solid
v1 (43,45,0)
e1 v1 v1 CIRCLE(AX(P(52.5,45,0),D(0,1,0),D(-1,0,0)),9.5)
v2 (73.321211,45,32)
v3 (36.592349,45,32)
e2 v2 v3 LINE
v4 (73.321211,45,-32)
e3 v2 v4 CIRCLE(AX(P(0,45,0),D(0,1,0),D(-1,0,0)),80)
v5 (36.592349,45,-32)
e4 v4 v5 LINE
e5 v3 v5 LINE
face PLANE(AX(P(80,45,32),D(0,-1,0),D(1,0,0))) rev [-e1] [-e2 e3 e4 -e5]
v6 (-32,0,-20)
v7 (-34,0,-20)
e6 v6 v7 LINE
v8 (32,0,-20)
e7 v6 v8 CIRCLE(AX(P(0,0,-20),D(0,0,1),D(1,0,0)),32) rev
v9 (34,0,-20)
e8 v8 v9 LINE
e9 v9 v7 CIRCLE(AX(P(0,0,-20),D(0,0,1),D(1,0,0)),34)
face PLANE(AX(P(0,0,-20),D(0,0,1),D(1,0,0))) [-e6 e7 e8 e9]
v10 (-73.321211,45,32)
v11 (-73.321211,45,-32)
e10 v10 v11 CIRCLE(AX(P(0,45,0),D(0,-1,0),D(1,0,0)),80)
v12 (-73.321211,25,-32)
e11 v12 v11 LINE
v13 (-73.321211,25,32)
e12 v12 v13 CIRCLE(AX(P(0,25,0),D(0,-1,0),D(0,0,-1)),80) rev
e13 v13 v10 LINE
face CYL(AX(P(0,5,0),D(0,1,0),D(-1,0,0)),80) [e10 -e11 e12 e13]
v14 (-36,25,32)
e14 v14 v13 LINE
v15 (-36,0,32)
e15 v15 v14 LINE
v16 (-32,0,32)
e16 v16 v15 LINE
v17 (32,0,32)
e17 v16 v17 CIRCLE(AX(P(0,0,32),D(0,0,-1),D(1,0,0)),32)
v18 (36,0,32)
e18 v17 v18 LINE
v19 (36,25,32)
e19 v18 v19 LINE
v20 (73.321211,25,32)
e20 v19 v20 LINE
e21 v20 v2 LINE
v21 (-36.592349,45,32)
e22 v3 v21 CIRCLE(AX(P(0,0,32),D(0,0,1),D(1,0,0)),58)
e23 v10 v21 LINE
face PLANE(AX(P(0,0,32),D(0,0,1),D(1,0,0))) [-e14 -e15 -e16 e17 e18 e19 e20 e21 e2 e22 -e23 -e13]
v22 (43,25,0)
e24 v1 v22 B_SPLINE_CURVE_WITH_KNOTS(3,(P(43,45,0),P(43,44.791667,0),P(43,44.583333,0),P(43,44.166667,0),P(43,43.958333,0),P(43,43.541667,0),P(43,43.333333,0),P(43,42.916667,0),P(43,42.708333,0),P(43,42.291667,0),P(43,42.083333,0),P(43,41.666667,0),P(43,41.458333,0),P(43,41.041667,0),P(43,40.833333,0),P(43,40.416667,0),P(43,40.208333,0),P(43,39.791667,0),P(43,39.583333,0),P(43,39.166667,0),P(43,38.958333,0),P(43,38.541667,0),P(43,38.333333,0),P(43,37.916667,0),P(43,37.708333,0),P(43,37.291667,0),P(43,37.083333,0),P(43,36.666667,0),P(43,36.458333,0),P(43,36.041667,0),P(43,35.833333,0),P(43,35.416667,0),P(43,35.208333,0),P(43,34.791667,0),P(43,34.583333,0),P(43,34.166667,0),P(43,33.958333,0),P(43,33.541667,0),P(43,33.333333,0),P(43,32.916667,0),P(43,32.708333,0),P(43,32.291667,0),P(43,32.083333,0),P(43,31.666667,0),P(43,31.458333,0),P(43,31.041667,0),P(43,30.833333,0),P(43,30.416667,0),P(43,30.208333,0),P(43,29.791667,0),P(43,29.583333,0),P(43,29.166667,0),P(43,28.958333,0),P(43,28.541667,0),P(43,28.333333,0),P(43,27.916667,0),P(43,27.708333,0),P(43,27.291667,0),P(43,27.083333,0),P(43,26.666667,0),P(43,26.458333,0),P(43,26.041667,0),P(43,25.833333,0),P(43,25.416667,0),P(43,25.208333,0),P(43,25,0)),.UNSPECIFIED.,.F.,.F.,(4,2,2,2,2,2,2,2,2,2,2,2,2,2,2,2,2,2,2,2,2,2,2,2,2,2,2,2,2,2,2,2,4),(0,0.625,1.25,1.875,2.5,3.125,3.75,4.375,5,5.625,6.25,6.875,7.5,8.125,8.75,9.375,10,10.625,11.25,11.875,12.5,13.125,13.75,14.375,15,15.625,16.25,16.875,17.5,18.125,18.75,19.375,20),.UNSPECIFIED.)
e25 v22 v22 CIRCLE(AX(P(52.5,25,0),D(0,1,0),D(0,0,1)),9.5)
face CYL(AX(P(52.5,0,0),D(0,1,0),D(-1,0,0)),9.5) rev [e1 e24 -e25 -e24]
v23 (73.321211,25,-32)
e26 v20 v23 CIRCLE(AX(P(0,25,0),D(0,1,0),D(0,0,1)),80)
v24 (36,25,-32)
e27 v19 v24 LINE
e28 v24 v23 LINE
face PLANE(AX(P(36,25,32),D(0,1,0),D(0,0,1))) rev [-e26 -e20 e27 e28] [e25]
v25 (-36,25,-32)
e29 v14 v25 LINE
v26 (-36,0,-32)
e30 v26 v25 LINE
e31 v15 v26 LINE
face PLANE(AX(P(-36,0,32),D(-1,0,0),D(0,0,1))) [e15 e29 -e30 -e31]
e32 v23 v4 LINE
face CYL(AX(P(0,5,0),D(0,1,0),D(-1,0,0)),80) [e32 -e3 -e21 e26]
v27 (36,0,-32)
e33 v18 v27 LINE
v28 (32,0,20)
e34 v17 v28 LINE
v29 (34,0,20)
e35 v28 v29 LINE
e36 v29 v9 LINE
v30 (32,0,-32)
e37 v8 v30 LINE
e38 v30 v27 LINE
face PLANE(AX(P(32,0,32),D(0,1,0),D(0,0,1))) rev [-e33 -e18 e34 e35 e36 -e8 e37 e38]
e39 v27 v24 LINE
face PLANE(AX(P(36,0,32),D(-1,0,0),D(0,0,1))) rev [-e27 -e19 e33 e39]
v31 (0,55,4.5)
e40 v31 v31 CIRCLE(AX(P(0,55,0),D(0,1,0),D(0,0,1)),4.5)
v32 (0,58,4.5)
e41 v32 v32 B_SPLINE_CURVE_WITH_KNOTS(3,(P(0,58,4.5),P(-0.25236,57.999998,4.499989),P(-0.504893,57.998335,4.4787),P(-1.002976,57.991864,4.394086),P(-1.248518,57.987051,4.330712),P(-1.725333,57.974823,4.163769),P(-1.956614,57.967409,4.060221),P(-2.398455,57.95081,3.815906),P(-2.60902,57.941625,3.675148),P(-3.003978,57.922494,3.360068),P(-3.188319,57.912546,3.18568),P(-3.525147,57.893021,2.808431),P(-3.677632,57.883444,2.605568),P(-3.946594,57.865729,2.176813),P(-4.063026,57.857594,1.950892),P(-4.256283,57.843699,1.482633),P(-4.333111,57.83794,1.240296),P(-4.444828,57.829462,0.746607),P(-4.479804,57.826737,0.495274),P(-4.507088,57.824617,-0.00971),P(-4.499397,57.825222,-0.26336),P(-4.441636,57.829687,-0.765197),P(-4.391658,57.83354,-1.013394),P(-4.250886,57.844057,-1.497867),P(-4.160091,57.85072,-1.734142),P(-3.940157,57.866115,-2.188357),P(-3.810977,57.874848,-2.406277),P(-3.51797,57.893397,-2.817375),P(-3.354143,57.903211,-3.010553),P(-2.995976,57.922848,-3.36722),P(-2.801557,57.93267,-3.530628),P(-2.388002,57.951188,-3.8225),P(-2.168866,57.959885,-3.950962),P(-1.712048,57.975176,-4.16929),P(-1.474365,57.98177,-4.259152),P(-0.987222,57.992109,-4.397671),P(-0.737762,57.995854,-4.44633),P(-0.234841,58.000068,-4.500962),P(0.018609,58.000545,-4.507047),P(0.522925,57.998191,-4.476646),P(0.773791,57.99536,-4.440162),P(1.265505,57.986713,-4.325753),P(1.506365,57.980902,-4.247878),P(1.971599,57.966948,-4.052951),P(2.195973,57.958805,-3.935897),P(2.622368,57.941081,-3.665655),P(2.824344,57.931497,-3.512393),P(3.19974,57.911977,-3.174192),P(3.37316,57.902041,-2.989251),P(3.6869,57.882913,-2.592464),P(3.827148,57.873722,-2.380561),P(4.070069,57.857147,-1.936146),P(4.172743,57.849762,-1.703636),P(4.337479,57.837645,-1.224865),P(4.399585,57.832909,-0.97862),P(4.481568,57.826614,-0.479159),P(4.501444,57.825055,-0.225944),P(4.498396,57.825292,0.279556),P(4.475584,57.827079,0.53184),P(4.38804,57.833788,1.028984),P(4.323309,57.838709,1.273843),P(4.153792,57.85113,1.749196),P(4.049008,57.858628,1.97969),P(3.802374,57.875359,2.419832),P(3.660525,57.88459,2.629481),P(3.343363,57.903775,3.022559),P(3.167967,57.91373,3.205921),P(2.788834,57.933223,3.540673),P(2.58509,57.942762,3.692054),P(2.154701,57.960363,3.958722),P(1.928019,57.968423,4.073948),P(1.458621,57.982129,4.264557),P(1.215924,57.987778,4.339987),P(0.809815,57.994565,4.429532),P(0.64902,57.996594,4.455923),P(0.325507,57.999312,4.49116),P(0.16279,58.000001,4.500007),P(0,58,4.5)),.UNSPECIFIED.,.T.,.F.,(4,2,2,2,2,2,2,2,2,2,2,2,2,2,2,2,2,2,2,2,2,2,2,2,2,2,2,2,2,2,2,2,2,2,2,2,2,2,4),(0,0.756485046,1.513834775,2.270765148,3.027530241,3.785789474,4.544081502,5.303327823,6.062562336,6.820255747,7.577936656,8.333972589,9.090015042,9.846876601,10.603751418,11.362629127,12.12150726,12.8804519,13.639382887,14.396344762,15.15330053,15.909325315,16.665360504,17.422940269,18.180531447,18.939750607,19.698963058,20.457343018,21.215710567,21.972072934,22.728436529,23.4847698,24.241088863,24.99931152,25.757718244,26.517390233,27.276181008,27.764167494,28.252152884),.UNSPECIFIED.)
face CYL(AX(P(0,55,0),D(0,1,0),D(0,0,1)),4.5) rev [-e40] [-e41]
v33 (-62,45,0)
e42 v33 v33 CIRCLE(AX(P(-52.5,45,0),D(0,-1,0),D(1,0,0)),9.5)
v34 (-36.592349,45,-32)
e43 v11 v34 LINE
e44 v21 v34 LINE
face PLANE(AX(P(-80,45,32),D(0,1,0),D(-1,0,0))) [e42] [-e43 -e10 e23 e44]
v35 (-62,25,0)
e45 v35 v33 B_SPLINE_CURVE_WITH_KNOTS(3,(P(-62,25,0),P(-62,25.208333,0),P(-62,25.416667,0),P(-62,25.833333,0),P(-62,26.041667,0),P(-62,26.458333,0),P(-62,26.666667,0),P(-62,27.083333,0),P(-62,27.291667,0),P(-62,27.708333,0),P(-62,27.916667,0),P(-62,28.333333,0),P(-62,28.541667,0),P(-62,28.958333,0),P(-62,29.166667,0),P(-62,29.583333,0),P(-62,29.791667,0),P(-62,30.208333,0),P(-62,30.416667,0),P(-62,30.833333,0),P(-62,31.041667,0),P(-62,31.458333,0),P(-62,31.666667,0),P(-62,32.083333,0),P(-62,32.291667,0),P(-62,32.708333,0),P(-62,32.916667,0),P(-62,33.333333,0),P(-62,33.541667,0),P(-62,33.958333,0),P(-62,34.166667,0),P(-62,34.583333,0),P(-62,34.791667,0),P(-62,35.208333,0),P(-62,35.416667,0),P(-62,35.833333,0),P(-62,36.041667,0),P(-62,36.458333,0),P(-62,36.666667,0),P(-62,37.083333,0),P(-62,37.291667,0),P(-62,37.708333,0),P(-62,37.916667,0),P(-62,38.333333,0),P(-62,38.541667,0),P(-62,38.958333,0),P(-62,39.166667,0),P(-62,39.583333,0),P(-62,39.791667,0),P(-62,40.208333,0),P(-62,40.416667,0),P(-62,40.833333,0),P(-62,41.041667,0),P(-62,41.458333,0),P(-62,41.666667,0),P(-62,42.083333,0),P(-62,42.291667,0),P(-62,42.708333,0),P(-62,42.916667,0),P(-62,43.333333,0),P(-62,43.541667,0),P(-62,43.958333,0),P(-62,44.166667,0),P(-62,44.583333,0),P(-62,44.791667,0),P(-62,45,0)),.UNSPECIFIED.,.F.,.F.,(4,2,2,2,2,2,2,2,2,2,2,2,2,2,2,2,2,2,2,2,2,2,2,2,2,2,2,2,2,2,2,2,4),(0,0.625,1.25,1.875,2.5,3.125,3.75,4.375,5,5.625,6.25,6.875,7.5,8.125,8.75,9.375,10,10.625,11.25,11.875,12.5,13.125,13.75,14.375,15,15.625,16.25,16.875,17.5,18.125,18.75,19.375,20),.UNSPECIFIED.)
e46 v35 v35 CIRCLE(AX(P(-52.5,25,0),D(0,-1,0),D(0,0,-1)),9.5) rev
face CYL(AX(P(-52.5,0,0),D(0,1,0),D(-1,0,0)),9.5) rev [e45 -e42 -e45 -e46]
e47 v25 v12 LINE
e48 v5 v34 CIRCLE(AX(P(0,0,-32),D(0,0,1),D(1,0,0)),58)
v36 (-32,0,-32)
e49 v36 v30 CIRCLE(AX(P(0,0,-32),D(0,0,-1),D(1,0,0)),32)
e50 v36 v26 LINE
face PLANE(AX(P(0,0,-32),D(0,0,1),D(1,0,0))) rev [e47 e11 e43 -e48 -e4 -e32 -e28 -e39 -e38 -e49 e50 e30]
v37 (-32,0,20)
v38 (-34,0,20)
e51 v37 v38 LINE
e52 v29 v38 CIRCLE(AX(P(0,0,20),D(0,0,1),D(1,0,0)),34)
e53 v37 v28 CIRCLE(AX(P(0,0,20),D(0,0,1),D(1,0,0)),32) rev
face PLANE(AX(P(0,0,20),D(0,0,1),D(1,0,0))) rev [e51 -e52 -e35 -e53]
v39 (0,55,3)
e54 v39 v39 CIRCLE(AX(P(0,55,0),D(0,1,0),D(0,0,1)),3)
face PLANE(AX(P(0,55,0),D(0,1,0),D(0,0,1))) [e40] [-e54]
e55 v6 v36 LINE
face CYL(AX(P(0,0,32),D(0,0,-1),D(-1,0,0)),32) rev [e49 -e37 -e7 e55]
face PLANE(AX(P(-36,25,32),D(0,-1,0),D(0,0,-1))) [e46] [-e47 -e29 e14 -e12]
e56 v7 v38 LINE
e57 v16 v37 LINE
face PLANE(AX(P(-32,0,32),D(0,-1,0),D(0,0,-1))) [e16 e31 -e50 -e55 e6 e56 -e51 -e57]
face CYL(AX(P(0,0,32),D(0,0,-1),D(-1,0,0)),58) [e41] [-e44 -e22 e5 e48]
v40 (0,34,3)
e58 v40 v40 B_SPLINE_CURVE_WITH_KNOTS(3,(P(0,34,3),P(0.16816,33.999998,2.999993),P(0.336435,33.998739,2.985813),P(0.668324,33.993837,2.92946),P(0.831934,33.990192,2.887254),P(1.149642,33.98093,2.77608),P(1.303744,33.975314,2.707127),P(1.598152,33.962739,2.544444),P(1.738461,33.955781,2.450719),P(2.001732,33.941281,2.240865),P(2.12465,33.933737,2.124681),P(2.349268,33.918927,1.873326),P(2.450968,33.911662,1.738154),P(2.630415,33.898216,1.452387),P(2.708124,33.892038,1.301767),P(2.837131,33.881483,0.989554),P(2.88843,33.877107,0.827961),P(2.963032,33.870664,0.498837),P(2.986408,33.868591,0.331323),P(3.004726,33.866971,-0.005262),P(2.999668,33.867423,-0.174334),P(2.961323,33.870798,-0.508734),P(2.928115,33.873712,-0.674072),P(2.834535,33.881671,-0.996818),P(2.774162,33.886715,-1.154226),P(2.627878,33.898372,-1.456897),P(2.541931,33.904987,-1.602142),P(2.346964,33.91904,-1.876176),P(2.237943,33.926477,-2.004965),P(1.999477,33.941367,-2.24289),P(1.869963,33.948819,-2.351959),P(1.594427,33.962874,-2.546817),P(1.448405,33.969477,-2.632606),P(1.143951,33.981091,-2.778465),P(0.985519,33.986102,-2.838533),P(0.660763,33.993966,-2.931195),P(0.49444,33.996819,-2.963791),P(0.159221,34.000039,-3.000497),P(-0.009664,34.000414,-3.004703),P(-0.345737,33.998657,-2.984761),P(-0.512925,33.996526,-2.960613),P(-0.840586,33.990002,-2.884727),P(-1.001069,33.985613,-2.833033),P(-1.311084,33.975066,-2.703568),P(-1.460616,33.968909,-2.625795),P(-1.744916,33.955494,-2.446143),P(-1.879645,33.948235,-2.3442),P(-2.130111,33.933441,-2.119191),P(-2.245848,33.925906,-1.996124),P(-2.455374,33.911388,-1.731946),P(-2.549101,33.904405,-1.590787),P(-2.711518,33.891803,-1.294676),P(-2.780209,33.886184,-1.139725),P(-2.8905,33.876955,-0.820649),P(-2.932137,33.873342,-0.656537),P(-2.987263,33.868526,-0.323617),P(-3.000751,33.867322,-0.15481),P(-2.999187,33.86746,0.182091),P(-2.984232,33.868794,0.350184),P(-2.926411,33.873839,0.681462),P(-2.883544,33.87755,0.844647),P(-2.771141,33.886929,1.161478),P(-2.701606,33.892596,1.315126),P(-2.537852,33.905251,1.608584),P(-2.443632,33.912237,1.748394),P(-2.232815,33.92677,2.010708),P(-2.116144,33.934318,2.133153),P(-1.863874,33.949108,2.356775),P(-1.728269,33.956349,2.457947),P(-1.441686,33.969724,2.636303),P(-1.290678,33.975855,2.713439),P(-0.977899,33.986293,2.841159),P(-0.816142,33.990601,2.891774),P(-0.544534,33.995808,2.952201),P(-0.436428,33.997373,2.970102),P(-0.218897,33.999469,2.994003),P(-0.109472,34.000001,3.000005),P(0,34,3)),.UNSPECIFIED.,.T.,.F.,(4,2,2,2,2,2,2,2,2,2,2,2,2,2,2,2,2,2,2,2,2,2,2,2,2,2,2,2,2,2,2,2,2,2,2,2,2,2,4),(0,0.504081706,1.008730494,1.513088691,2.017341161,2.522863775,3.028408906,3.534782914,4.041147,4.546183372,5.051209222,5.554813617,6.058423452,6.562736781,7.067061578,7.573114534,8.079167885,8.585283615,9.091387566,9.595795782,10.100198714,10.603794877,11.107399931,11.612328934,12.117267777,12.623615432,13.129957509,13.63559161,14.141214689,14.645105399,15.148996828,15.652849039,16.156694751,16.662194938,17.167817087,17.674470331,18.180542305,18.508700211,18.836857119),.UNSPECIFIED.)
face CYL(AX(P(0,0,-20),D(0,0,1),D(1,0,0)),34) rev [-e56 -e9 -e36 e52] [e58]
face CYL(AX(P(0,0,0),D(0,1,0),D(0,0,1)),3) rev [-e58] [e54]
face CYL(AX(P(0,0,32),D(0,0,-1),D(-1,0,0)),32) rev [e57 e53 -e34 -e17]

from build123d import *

# Parameters (mm, degrees)
BOSS_EXTRUDE1_DEPTH = 32
SKETCH2_R           = 9.5
CUT_EXTRUDE1_DEPTH  = 98.205966895
SKETCH3_R           = 34
CUT_EXTRUDE2_DEPTH  = 20
CUT_EXTRUDE3_START  = -20
CUT_EXTRUDE3_DEPTH  = 20
SKETCH5_R           = 4.5
CUT_EXTRUDE4_DEPTH  = 3
SKETCH6_R           = 3
CUT_EXTRUDE5_DEPTH  = 104.865297412


# Read off the part's stored shape, not the designer's step: Cut-Extrude3
with BuildPart() as part:
    # Sketch1 → Boss-Extrude1 (new, symmetric)
    with BuildSketch(Plane.XY):
        with BuildLine():
            Line((32, 0), (36, 0))
            Line((36, 0), (36, 25))
            Line((36, 25), (80, 25))
            Line((80, 25), (80, 45))
            Line((80, 45), (36.592348927, 45))
            ThreePointArc((36.592348927, 45), (19.416487839, 54.653453688), (0, 58))
            Line((0, 58), (0, 32))
            ThreePointArc((0, 32), (22.627416998, 22.627416998), (32, 0))
        make_face()
    boss_extrude1 = extrude(amount=BOSS_EXTRUDE1_DEPTH, both=True)

    # Sketch2 → Cut-Extrude1 (cut, through all)
    with BuildSketch(Plane(origin=(0, 45, 0), x_dir=(1, 0, 0), z_dir=(0, 1, 0))):
        with Locations(Location((52.5, 0, 0), (0, 0, 180))):
            Circle(SKETCH2_R)
    cut_extrude1 = extrude(amount=-CUT_EXTRUDE1_DEPTH, mode=Mode.SUBTRACT)

    # Sketch3 → Cut-Extrude2 (cut, symmetric)
    with BuildSketch(Plane.XY):
        Circle(SKETCH3_R)
    cut_extrude2 = extrude(amount=CUT_EXTRUDE2_DEPTH, both=True, mode=Mode.SUBTRACT)

    # Cut-Extrude3 outline → Cut-Extrude3 (cut)
    with BuildSketch(Plane(origin=(0, 45, 0), x_dir=(1, 0, 0), z_dir=(0, 1, 0)).offset(CUT_EXTRUDE3_START)):
        with BuildLine():
            ThreePointArc((73.321211119, 32), (78.312505014, 16.344771592), (80, 1.98e-07))
            Line((80, 1.98e-07), (80, 32))
            Line((80, 32), (73.321211119, 32))
        make_face()
        with BuildLine():
            ThreePointArc((80, 1.98e-07), (78.312505055, -16.344771398), (73.321211119, -32))
            Line((73.321211119, -32), (80, -32))
            Line((80, -32), (80, 1.98e-07))
        make_face()
    cut_extrude3 = extrude(amount=CUT_EXTRUDE3_DEPTH, mode=Mode.SUBTRACT)

    # Mirror1: Boss-Extrude1, Cut-Extrude1, Cut-Extrude2, Cut-Extrude3 across plane
    add(boss_extrude1.mirror(Plane(origin=(0, 32, 32), x_dir=(0, 0, 1), z_dir=(1, 0, 0))))
    add(cut_extrude1.mirror(Plane(origin=(0, 32, 32), x_dir=(0, 0, 1), z_dir=(1, 0, 0))), mode=Mode.SUBTRACT)
    add(cut_extrude2.mirror(Plane(origin=(0, 32, 32), x_dir=(0, 0, 1), z_dir=(1, 0, 0))), mode=Mode.SUBTRACT)
    add(cut_extrude3.mirror(Plane(origin=(0, 32, 32), x_dir=(0, 0, 1), z_dir=(1, 0, 0))), mode=Mode.SUBTRACT)

    # Sketch5 → Cut-Extrude4 (cut)
    with BuildSketch(Plane(origin=(0, 58, 0), x_dir=(1, 0, 0), z_dir=(0, 1, 0))):
        with Locations(Location((0, 0, 0), (0, 0, 270))):
            Circle(SKETCH5_R)
    extrude(amount=-CUT_EXTRUDE4_DEPTH, mode=Mode.SUBTRACT)

    # Sketch6 → Cut-Extrude5 (cut, through all)
    with BuildSketch(Plane(origin=(0, 58, 0), x_dir=(1, 0, 0), z_dir=(0, 1, 0))):
        with Locations(Location((0, 0, 0), (0, 0, 270))):
            Circle(SKETCH6_R)
    extrude(amount=-CUT_EXTRUDE5_DEPTH, mode=Mode.SUBTRACT)


solid = part.part
